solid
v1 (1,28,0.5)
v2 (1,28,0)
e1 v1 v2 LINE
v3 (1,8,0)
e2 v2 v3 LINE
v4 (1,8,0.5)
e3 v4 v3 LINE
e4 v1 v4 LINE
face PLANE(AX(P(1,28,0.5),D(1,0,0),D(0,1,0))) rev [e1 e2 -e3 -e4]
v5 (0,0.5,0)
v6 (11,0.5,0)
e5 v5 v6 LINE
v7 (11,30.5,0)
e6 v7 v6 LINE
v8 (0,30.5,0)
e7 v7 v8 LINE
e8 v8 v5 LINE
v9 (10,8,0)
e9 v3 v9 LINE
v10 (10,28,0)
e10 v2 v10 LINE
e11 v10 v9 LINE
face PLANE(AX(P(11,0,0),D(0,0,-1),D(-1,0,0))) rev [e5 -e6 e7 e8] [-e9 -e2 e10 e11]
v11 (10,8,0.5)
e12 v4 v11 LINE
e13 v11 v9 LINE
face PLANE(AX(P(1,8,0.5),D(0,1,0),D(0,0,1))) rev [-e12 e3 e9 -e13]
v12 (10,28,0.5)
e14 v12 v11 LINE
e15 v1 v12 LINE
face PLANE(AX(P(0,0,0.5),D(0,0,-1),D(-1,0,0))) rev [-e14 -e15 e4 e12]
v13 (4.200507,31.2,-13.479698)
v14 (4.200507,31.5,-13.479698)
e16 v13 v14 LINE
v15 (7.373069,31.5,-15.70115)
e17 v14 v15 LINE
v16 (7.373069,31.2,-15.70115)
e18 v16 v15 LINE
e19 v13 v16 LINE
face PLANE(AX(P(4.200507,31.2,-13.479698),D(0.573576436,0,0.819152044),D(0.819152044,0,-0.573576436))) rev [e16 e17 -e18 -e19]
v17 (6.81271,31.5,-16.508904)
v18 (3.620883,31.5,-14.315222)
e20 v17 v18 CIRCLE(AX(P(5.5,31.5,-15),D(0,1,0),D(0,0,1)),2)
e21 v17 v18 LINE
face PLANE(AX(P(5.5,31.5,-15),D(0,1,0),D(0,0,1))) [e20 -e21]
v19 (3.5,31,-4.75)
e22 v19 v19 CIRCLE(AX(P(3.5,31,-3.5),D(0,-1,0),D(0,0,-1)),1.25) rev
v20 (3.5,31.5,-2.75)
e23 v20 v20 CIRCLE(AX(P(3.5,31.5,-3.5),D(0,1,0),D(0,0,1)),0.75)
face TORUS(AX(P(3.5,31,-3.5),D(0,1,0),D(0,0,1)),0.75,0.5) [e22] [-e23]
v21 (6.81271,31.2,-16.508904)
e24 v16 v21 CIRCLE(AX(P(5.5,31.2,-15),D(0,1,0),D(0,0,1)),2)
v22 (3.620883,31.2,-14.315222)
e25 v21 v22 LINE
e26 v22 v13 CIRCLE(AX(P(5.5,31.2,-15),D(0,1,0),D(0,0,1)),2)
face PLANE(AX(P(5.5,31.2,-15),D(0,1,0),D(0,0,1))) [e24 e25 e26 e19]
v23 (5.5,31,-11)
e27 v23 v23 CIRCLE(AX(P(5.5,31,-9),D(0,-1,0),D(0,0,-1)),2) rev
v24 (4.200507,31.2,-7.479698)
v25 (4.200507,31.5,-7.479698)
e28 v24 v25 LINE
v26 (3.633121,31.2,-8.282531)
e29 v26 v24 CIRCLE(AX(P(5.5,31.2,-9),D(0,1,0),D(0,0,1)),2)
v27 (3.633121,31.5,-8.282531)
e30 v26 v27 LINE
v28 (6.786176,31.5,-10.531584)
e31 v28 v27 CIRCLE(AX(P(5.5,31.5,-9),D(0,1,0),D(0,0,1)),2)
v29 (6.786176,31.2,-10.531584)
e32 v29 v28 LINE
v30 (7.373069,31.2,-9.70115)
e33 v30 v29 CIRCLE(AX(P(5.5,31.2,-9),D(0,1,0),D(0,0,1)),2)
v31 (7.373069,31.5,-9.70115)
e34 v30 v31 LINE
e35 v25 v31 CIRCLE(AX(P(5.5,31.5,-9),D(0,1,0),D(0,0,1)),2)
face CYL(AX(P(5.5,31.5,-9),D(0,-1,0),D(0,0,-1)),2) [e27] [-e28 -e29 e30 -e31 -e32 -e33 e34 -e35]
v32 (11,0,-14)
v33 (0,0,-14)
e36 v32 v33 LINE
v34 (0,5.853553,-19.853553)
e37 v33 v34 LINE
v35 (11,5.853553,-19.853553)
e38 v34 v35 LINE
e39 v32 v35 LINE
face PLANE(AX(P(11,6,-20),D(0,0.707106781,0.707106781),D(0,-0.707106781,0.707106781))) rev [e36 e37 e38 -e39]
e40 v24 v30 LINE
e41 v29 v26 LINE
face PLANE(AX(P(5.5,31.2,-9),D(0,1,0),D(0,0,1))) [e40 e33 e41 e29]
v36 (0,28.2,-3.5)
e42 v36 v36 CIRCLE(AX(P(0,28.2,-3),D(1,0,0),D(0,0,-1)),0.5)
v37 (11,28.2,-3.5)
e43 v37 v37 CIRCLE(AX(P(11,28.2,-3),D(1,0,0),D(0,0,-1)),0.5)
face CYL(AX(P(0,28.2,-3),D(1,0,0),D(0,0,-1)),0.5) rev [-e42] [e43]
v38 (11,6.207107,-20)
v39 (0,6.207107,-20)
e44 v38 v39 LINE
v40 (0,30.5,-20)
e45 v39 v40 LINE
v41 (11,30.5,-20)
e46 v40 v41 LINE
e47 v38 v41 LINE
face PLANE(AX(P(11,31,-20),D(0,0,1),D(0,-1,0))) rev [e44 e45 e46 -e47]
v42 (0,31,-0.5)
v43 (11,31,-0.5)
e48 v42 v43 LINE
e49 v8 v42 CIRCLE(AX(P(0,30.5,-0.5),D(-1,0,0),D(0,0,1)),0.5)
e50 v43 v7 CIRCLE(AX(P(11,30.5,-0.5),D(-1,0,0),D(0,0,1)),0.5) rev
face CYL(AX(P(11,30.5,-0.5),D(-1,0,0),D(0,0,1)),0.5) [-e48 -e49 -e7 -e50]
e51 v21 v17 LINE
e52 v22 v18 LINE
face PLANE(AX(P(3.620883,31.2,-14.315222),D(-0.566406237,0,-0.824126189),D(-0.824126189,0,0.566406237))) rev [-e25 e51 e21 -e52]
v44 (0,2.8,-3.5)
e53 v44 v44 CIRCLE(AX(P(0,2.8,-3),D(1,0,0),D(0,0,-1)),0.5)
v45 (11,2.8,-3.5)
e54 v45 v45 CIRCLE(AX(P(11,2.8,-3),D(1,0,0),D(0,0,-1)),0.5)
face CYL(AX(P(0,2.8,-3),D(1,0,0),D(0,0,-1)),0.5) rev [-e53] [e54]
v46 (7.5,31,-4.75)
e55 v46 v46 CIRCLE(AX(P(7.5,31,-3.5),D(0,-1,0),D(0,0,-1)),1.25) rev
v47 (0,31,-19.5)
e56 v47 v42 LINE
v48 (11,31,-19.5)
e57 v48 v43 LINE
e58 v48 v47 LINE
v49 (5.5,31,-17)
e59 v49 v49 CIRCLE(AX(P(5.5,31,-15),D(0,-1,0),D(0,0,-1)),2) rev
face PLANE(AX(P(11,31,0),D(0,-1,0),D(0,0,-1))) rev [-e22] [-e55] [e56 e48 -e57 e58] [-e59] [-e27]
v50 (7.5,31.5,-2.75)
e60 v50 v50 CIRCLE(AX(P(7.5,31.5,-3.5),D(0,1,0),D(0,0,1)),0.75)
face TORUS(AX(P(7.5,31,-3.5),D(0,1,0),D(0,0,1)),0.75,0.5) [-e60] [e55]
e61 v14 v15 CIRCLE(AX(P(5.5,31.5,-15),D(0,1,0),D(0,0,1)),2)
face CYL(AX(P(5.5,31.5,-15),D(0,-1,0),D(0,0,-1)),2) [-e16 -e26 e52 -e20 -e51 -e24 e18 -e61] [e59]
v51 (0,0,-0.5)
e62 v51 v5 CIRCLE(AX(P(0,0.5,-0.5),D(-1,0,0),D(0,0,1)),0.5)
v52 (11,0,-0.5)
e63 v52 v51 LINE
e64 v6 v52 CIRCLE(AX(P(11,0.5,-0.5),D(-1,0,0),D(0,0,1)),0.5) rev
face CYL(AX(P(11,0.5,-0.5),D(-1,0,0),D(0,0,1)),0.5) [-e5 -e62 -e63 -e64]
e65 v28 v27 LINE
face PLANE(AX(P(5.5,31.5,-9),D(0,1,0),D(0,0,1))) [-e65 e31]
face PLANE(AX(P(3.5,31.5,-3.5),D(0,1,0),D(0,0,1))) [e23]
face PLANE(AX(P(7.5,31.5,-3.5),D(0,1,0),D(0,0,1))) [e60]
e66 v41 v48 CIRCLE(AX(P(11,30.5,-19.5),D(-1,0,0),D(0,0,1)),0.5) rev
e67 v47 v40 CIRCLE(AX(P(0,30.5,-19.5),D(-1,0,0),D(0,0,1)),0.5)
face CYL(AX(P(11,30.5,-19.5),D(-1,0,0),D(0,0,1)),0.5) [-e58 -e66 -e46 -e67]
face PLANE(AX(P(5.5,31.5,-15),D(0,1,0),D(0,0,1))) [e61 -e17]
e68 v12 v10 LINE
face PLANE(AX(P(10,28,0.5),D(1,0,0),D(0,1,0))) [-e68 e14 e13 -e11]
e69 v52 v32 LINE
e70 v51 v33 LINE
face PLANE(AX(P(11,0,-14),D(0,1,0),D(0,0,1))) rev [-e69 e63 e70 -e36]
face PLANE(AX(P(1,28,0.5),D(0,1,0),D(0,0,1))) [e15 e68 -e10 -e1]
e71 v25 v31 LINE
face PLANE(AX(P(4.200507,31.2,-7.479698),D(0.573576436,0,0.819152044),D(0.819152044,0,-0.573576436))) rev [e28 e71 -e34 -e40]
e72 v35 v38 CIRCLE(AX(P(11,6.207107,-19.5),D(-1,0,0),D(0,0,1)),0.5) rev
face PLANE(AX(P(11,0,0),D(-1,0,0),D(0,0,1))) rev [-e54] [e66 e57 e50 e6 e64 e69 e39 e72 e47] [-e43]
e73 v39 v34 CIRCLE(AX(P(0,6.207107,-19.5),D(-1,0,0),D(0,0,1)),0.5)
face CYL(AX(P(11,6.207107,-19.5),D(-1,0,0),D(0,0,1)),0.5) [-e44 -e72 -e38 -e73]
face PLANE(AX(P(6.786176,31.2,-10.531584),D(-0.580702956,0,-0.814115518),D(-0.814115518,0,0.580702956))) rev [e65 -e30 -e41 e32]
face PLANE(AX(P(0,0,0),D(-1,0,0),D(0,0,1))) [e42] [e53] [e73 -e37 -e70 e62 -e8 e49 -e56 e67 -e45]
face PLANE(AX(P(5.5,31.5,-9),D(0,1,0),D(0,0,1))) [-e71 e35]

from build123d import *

# Parameters (mm, degrees)
BOSS_EXTRUDE1_DEPTH = 11
SKETCH2_R           = 0.5
CUT_EXTRUDE1_DEPTH  = 39.49675311
SKETCH3_W           = 9
SKETCH3_H           = 20
BOSS_EXTRUDE2_DEPTH = 0.5
SKETCH5_R           = 1.25
SKETCH5_R_2         = 2
BOSS_EXTRUDE3_DEPTH = 0.5
FILLET2_R           = 0.5
FILLET3_R           = 0.5
FILLET4_R           = 0.5
FILLET5_R           = 0.5
FILLET6_R           = 0.5
FILLET7_R           = 0.5
CUT_EXTRUDE3_START  = -0.3
CUT_EXTRUDE3_DEPTH  = 0.3


with BuildPart() as part:
    # Sketch1 → Boss-Extrude1 (new body)
    with BuildSketch(Plane(origin=(0, 0, 0), x_dir=(0, 0, -1), z_dir=(1, 0, 0))):
        Polygon((0, 0), (0, 31), (20, 31), (20, 6), (14, 0), align=None)
    extrude(amount=BOSS_EXTRUDE1_DEPTH)

    # Sketch2 → Cut-Extrude1 (cut, through all)
    with BuildSketch(Plane(origin=(11, 0, 0), x_dir=(0, 0, -1), z_dir=(1, 0, 0))):
        with Locations((3, 2.8)):
            Circle(SKETCH2_R)
        with Locations((3, 28.2)):
            Circle(SKETCH2_R)
    extrude(amount=-CUT_EXTRUDE1_DEPTH, mode=Mode.SUBTRACT)

    # Sketch3 → Boss-Extrude2 (add)
    with BuildSketch(Plane.XY):
        with Locations((5.5, 18)):
            Rectangle(SKETCH3_W, SKETCH3_H)
    extrude(amount=BOSS_EXTRUDE2_DEPTH)

    # Sketch5 → Boss-Extrude3 (add)
    with BuildSketch(Plane(origin=(0, 31, 0), x_dir=(1, 0, 0), z_dir=(0, 1, 0))):
        with Locations(Location((3.5, 3.5, 0), (0, 0, 90))):
            Circle(SKETCH5_R)
        with Locations(Location((7.5, 3.5, 0), (0, 0, 90))):
            Circle(SKETCH5_R)
        with Locations(Location((5.5, 15, 0), (0, 0, 90))):
            Circle(SKETCH5_R_2)
        with Locations(Location((5.5, 9, 0), (0, 0, 90))):
            Circle(SKETCH5_R_2)
    extrude(amount=BOSS_EXTRUDE3_DEPTH)

    # Fillet2
    fillet2_edges = [part.edges().sort_by_distance(p)[0] for p in [
        (3.5, 31.5, -2.25),
    ]]
    fillet(fillet2_edges, radius=FILLET2_R - 0.0001)  # a hair under: the kernel refuses the full size

    # Fillet3
    fillet3_edges = [part.edges().sort_by_distance(p)[0] for p in [
        (7.5, 31.5, -2.25),
    ]]
    fillet(fillet3_edges, radius=FILLET3_R - 0.0001)  # a hair under: the kernel refuses the full size

    # Fillet4
    fillet4_edges = [part.edges().sort_by_distance(p)[0] for p in [
        (5.5, 31, 0),
    ]]
    fillet(fillet4_edges, radius=FILLET4_R)

    # Fillet5
    fillet5_edges = [part.edges().sort_by_distance(p)[0] for p in [
        (5.5, 31, -20),
    ]]
    fillet(fillet5_edges, radius=FILLET5_R)

    # Fillet6
    fillet6_edges = [part.edges().sort_by_distance(p)[0] for p in [
        (5.5, 0, 0),
    ]]
    fillet(fillet6_edges, radius=FILLET6_R)

    # Fillet7
    fillet7_edges = [part.edges().sort_by_distance(p)[0] for p in [
        (5.5, 6, -20),
    ]]
    fillet(fillet7_edges, radius=FILLET7_R)

    # Sketch6 → Cut-Extrude3 (cut)
    with BuildSketch(Plane(origin=(0, 31.5, 0), x_dir=(1, 0, 0), z_dir=(0, 1, 0)).offset(CUT_EXTRUDE3_START)):
        with BuildLine():
            Line((6.786176444, 10.531584197), (3.6331206, 8.282531321))
            ThreePointArc((3.6331206, 8.282531321), (3.86671689, 7.84570962), (4.200507105, 7.479697985))
            Line((4.200507105, 7.479697985), (7.373069331, 9.701149971))
            ThreePointArc((7.373069331, 9.701149971), (7.13328311, 10.15429038), (6.786176444, 10.531584197))
        make_face()
        with BuildLine():
            Line((3.62088338, 14.315222133), (6.812710383, 16.508904056))
            ThreePointArc((6.812710383, 16.508904056), (7.143293876, 16.139993525), (7.373069331, 15.701149971))
            Line((7.373069331, 15.701149971), (4.200507105, 13.479697985))
            ThreePointArc((4.200507105, 13.479697985), (3.856706124, 13.860006475), (3.62088338, 14.315222133))
        make_face()
    extrude(amount=CUT_EXTRUDE3_DEPTH, mode=Mode.SUBTRACT)


solid = part.part
